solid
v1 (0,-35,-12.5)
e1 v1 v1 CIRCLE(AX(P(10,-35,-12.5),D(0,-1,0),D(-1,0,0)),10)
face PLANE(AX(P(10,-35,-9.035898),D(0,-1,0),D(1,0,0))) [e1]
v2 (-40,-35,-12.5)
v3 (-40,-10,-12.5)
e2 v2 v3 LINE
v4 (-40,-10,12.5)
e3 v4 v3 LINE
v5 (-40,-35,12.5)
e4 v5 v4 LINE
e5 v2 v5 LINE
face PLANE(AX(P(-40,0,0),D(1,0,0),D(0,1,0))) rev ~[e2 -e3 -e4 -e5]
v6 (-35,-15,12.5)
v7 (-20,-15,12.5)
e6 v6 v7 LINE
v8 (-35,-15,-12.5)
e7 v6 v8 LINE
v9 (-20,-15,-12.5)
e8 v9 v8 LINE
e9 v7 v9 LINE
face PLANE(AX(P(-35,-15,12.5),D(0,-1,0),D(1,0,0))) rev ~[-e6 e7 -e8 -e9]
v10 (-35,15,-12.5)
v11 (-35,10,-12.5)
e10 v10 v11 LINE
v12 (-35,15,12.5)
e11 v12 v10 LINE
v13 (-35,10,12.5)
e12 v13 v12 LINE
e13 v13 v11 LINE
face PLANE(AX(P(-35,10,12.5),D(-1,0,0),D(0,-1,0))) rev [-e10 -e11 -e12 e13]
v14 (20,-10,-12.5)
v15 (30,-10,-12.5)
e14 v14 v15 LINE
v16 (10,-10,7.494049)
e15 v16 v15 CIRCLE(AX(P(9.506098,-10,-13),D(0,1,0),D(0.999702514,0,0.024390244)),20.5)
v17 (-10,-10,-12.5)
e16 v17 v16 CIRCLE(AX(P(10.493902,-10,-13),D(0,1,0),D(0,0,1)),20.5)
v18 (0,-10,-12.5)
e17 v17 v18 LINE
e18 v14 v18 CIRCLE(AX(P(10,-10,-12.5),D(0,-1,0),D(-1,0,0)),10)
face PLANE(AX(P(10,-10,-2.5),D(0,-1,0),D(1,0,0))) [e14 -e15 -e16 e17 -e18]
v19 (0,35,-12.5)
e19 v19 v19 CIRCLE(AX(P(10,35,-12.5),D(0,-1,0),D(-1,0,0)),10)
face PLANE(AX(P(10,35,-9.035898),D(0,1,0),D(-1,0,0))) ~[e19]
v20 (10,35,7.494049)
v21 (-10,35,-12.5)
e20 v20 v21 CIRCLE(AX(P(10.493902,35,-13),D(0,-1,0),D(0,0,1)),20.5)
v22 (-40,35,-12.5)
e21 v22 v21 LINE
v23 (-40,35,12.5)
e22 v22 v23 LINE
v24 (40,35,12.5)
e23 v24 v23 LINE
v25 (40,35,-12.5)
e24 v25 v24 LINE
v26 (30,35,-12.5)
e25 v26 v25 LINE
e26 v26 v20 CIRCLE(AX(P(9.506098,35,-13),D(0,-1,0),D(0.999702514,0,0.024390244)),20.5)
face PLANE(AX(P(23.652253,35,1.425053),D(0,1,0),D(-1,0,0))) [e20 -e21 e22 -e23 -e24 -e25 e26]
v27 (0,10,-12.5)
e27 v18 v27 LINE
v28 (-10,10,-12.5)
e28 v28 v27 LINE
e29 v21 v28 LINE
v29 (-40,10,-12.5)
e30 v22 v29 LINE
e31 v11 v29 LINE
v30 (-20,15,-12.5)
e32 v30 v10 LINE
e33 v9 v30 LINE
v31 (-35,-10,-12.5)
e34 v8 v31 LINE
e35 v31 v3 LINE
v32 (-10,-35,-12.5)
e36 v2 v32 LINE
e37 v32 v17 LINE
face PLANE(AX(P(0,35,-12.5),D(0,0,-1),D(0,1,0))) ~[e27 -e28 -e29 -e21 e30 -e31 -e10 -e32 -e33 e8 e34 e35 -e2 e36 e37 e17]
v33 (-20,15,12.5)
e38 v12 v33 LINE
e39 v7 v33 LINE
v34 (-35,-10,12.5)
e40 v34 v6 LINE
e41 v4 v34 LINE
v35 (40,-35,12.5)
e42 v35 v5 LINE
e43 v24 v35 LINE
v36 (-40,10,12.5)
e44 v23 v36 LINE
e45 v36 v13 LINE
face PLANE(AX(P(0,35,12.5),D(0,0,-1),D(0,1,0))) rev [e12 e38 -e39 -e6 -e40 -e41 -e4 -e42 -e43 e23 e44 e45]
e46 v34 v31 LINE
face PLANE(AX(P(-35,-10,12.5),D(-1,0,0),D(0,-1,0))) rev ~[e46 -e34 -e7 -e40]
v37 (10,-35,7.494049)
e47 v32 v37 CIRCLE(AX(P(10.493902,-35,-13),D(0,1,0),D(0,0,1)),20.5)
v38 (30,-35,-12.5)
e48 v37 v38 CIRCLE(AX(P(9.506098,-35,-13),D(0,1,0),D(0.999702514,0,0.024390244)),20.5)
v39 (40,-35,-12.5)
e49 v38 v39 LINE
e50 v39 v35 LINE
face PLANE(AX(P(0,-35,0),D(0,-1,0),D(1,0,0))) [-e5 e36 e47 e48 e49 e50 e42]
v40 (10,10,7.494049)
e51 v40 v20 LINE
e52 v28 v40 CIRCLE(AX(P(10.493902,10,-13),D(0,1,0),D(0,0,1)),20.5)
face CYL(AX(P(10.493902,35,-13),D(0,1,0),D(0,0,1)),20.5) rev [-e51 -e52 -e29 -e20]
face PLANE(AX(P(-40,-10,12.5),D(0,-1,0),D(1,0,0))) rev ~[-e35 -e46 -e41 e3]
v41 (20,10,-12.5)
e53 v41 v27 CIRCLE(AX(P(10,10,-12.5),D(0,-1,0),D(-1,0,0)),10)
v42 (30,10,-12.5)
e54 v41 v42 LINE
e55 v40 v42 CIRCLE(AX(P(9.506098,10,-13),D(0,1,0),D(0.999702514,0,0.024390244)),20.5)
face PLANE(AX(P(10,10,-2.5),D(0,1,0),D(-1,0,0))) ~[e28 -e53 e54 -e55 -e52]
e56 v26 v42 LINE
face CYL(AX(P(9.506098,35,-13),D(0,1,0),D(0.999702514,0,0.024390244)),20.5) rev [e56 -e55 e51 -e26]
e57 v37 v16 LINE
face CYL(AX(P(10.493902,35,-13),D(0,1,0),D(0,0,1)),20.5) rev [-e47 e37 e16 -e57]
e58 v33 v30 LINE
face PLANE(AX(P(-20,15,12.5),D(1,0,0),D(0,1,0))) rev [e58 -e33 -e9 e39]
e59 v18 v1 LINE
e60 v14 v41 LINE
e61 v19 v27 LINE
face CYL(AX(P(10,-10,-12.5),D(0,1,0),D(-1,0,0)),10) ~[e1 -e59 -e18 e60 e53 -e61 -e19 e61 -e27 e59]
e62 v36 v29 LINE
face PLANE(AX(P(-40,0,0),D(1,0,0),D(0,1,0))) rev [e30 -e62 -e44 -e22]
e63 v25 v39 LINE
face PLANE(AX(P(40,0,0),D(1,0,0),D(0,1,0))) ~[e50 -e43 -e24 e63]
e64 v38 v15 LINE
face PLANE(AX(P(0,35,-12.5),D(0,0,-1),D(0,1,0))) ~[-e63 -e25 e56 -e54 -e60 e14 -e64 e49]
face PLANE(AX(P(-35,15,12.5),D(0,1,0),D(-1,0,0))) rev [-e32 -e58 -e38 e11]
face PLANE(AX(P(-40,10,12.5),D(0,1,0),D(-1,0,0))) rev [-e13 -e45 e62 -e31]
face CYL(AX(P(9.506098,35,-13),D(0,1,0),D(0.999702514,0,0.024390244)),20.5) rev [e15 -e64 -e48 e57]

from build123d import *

# Parameters (mm, degrees)
F0_W          = 70
F0_H          = 25
F1_DEPTH      = 40
F1_DEPTH_BACK = 40
F3_DEPTH      = 40
F4_W          = 40
F4_H          = 20
F5_DEPTH      = 25
F7_DEPTH      = 25
F8_W          = 80
F8_H          = 25
F9_DEPTH      = 35
F11_DEPTH     = 25
F12_T4_DEPTH  = 76.2347538298
F12_T9_DEPTH  = 76.2347538298
F12_T14_DEPTH = 76.2347538298
F12_T19_DEPTH = 76.2347538298


# Not quite as in the source:
# - a fillet or chamfer that OpenCascade refuses, or shapes differently, is made with other operations: its cross-section is extruded or revolved along the edge and cut away or added


with BuildPart() as f1:
    # F0 (on Right) → F1 (new body, two sides)
    with BuildSketch(Plane.YZ) as f1_sk:
        Rectangle(F0_W, F0_H)
    extrude(amount=F1_DEPTH)
    extrude(f1_sk.sketch, amount=-F1_DEPTH_BACK)

    # F2 (on face) → F3 (cut)
    with BuildSketch(Plane.XY.offset(12.5)):
        Polygon((-40, 10), (-40, 0), (-20, 0), (-20, 15), (-35, 15), (-35, 10), align=None)
        Polygon((-20, 0), (-40, 0), (-40, -10), (-35, -10), (-35, -15), (-20, -15), align=None)
    extrude(amount=-F3_DEPTH, mode=Mode.SUBTRACT)

    # F4 (on face) → F5 (cut)
    with BuildSketch(Plane.XZ.offset(35)):
        with Locations((10, -2.5)):
            Rectangle(F4_W, F4_H)
    extrude(amount=-F5_DEPTH, mode=Mode.SUBTRACT)

    # F6 (on face) → F7 (join)
    with BuildSketch(Plane.XZ.offset(10)):
        with BuildLine():
            Line((0, -12.5), (20, -12.5))
            ThreePointArc((20, -12.5), (10, -2.5), (0, -12.5))
        make_face()
        with BuildLine():
            ThreePointArc((0, -12.5), (10, -22.5), (20, -12.5))
            Line((20, -12.5), (0, -12.5))
        make_face()
    extrude(amount=F7_DEPTH)

    # F8 (on face) → F9 (cut)
    with BuildSketch(Plane(origin=(0, 35, 0), x_dir=(-1, 0, 0), z_dir=(0, 1, 0))):
        Rectangle(F8_W, F8_H)
    extrude(amount=-F9_DEPTH, mode=Mode.SUBTRACT)

    # F10: F1 across plane


with BuildPart() as f1_1:
    add(f1.part)
    add(f1.part.mirror(Plane.XZ))

    # F11 (add): a face of the model
    f11_faces = [f1_1.faces().sort_by_distance(p)[0] for p in [
        (10, -10, -16.7441318158),
    ]]
    extrude(f11_faces, amount=F11_DEPTH)

    # F12: fillet of radius 20.5 on 4 edges, made by hand


with BuildPart() as f12_tool2:
    # F12_s3 → F12_t4 (new body)
    with BuildSketch(Plane.XZ.offset(-35)):
        with BuildLine():
            ThreePointArc((30, -12.5), (23.8239195314, 1.6714007511), (9.5060984681, 7.5))
            Line((9.5060984681, 7.5), (30, 7.5))
            Line((30, 7.5), (30, -12.5))
        make_face()
    extrude(amount=F12_T4_DEPTH)

    split(bisect_by=Plane.XZ.offset(35), keep=Keep.BOTTOM)


with BuildPart() as f1_2:
    add(f1_1.part)

    # F12_t1: union F12_tool2
    add(f12_tool2.part)


with BuildPart() as f12_tool7:
    # F12_s8 → F12_t9 (new body)
    with BuildSketch(Plane.XZ.offset(-35)):
        with BuildLine():
            ThreePointArc((10.4939015319, 7.5), (-3.8239195314, 1.6714007511), (-10, -12.5))
            Line((-10, -12.5), (-10, 7.5))
            Line((-10, 7.5), (10.4939015319, 7.5))
        make_face()
    extrude(amount=F12_T9_DEPTH)

    split(bisect_by=Plane.XZ.offset(35), keep=Keep.BOTTOM)


with BuildPart() as f1_3:
    add(f1_2.part)

    # F12_t6: union F12_tool7
    add(f12_tool7.part)


with BuildPart() as f12_tool12:
    # F12_s13 → F12_t14 (new body)
    with BuildSketch(Plane.XZ.offset(35)):
        with BuildLine():
            ThreePointArc((30, -12.5), (23.8239195314, 1.6714007511), (9.5060984681, 7.5))
            Line((9.5060984681, 7.5), (30, 7.5))
            Line((30, 7.5), (30, -12.5))
        make_face()
    extrude(amount=-F12_T14_DEPTH)

    split(bisect_by=Plane.XZ.offset(-35), keep=Keep.TOP)


with BuildPart() as f1_4:
    add(f1_3.part)

    # F12_t11: union F12_tool12
    add(f12_tool12.part)


with BuildPart() as f12_tool17:
    # F12_s18 → F12_t19 (new body)
    with BuildSketch(Plane.XZ.offset(35)):
        with BuildLine():
            ThreePointArc((-10, -12.5), (-3.8239195314, 1.6714007511), (10.4939015319, 7.5))
            Line((10.4939015319, 7.5), (-10, 7.5))
            Line((-10, 7.5), (-10, -12.5))
        make_face()
    extrude(amount=-F12_T19_DEPTH)

    split(bisect_by=Plane.XZ.offset(-35), keep=Keep.TOP)


with BuildPart() as f1_5:
    add(f1_4.part)

    # F12_t16: union F12_tool17
    add(f12_tool17.part)


solid = f1_5.part
